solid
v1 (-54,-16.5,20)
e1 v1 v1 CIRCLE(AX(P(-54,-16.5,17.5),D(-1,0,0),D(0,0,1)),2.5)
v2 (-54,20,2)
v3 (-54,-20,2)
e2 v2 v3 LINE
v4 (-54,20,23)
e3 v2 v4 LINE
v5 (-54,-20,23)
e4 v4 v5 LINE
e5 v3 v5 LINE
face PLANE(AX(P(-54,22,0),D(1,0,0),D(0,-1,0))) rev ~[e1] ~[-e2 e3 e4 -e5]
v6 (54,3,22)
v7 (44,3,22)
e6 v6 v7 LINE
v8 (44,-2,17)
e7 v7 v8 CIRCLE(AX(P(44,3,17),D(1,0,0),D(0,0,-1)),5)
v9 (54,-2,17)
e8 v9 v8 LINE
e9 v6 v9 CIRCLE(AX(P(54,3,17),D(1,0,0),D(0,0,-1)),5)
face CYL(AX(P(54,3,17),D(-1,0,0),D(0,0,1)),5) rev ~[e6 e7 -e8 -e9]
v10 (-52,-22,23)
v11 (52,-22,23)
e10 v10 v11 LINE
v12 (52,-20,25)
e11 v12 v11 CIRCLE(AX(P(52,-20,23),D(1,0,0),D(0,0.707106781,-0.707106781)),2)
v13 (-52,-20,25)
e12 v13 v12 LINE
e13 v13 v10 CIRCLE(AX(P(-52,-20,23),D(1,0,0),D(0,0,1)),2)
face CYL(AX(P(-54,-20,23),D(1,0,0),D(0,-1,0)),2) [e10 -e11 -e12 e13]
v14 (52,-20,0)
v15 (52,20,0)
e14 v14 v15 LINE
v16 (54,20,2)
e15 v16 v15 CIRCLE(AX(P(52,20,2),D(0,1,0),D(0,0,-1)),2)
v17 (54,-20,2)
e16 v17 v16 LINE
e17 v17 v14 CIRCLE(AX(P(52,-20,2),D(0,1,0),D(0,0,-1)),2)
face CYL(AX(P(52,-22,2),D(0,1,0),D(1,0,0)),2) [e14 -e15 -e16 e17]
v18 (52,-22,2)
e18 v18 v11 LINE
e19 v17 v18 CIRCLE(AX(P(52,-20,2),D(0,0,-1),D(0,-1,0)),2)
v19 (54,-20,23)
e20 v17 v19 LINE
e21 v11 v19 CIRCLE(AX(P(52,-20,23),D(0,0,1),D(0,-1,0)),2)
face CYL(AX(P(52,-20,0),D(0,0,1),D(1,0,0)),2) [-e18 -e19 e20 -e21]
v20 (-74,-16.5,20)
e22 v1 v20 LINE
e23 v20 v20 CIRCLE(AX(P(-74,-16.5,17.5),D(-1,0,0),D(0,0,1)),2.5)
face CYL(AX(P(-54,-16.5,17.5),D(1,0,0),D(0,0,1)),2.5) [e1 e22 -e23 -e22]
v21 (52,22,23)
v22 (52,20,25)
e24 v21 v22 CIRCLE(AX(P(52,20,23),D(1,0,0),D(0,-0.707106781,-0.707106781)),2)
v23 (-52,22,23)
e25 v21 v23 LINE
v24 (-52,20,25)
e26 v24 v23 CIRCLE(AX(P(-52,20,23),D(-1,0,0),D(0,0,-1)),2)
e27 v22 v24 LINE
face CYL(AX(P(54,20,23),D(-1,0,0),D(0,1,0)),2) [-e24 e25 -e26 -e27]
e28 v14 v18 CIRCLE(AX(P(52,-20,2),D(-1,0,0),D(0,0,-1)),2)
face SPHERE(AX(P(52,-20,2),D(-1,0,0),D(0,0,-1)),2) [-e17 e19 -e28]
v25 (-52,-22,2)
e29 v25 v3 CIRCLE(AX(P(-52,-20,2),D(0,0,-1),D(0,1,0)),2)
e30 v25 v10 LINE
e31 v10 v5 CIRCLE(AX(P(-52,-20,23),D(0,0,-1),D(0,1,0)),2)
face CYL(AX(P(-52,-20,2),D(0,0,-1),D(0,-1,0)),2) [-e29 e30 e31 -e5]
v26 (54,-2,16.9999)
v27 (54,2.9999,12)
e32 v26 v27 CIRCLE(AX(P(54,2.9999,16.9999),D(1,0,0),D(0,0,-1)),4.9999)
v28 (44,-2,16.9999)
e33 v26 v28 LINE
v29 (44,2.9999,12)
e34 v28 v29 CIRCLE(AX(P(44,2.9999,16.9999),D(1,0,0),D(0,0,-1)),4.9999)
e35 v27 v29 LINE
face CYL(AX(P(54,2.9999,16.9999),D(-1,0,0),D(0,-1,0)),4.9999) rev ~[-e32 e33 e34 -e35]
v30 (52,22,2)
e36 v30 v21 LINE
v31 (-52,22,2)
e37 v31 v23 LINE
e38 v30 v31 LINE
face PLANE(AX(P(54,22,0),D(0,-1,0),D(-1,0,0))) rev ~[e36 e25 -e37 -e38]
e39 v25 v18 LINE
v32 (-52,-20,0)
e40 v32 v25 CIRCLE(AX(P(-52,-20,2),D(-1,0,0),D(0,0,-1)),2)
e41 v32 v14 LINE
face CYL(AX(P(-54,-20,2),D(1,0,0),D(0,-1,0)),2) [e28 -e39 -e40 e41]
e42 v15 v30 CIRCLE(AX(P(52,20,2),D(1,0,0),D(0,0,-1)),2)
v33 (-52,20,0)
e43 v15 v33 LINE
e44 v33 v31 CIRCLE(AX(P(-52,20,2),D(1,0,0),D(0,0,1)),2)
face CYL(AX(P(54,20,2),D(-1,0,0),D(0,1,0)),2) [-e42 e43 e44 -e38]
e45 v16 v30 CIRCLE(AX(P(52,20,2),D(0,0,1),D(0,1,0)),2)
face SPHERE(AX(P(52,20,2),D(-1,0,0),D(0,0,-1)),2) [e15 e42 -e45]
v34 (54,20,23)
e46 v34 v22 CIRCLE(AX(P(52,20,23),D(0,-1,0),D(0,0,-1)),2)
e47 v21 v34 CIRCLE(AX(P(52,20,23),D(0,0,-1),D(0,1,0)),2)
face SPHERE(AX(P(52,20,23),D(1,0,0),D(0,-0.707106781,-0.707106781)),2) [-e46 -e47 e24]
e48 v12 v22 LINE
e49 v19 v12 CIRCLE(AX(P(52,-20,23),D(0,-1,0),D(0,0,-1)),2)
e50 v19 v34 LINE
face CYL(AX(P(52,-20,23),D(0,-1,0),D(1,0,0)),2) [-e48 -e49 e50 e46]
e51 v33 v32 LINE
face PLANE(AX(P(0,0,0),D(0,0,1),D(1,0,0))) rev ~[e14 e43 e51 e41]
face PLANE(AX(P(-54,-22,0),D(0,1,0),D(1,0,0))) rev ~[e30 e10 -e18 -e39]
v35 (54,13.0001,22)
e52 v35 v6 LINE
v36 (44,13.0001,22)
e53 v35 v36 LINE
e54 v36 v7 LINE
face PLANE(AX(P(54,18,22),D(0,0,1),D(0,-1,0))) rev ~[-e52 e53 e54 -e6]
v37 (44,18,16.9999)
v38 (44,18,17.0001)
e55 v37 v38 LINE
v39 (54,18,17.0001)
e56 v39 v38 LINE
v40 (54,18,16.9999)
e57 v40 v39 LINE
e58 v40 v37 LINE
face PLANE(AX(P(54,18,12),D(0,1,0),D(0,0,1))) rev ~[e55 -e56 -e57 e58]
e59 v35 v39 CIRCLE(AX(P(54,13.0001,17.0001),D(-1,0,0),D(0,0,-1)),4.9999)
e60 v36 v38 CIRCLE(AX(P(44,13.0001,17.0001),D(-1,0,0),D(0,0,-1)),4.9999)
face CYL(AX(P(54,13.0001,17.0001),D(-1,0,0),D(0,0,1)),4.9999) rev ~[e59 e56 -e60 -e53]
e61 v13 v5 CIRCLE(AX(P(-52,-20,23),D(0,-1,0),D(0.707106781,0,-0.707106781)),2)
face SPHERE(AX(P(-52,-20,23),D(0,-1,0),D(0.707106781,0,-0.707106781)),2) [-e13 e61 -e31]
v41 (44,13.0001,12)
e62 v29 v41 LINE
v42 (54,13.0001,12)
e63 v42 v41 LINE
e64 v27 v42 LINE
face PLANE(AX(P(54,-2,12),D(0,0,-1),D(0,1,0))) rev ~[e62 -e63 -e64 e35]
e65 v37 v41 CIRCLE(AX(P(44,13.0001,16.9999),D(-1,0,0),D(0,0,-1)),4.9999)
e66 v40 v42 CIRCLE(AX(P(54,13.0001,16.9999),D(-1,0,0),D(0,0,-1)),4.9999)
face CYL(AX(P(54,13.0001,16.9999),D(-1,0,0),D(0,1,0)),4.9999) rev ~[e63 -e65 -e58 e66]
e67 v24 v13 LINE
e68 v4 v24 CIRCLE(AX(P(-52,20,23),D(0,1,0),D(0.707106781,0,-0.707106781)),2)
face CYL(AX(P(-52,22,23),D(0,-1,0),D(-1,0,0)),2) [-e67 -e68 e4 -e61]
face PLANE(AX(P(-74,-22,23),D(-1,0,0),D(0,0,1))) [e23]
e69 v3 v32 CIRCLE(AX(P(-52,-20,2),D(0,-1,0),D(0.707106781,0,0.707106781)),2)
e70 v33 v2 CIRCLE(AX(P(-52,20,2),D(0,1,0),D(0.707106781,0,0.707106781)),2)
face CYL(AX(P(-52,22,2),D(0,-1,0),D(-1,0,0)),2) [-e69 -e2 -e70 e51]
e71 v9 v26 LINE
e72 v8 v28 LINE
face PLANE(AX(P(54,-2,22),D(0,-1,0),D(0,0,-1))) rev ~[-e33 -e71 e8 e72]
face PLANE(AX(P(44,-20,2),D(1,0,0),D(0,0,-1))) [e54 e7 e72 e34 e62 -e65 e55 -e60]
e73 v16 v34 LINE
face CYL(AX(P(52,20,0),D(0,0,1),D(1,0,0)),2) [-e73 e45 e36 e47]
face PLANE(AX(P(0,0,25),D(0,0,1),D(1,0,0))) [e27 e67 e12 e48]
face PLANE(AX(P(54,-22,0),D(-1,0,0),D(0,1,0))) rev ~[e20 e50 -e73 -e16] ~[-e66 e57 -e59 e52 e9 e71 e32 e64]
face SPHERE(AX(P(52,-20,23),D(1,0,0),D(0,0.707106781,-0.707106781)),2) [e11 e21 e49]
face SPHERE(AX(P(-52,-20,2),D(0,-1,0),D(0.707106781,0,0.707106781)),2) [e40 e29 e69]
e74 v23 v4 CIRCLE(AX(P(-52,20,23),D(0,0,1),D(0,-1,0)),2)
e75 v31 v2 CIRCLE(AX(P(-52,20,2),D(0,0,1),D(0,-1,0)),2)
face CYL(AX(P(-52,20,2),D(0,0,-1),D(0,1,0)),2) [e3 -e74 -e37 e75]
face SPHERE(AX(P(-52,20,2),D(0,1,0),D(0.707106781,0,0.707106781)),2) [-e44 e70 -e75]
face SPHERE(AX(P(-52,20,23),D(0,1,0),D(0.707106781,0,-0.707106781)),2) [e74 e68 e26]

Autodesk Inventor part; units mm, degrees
ref_plane "YZ Plane" through (0, 0, 0) normal (1, 0, 0) x (0, 1, 0)
ref_plane "XZ Plane" through (0, 0, 0) normal (0, 1, 0) x (-1, 0, 0)
ref_plane "XY Plane" through (0, 0, 0) normal (0, 0, 1) x (1, 0, 0)
sketch "Sketch1" plane through (0, 0, 0) normal (0, 0, 1) x (1, 0, 0)
  line L0 (54, 22) -> (-54, 22)
  line L1 (-54, 22) -> (-54, -22)
  line L2 (-54, -22) -> (54, -22)
  line L3 (54, -22) -> (54, 22)
  line L4 (-54, 0) -> (54, 0) construction
  line L5 (0, 22) -> (0, -22) construction
  point P0 (0, 0)
  point P1 (0, 0)
  dimension "d0" = 108
  dimension "d1" = 44
extrude "Extrusion1" add sketch "Sketch1" along normal blind 25
fillet "Fillet1" radius 2 9 edges at (0, 22, 25) (0, -22, 25) (0, -22, 0) (0, 22, 0) (54, 0, 0) (54, 22, 12.5) (54, -22, 12.5) (-54, 0, 25) (-54, 0, 0)
sketch "Sketch2" plane through (54, -20, 2) normal (1, 0, 0) x (0, 0, -1)
  line L0 (0, 0) -> (-23, 0) construction
  line L1 (0, 40) -> (0, 0) construction
  line L2 (-23, 40) -> (0, 40) construction
  line L3 (-23, 0) -> (-23, 40) construction
  line L4 (-20, 18) -> (-10, 18)
  line L5 (-10, 18) -> (-10, 38)
  line L6 (-10, 38) -> (-20, 38)
  line L7 (-20, 38) -> (-20, 18)
  point P0 (2, 20)
  dimension "d5" = 10
  dimension "d6" = 20
  dimension "d7" = 3
  dimension "d8" = 18
extrude "Extrusion2" cut sketch "Sketch2" against normal blind 10
sketch "Sketch3" plane through (-54, -22, 23) normal (-1, 0, 0) x (0, 0, 1)
  line L0 (0, 44) -> (0, 0) construction
  line L1 (-21, 0) -> (0, 0) construction
  circle A0 centre (-5.5, 5.5) radius 2.5
  point P0 (-23, 22)
  dimension "d11" = 5
  dimension "d13" = 3
  dimension "d14" = 3
extrude "Extrusion3" add sketch "Sketch3" along normal blind 20
fillet "Fillet2" radius 2 3 edges at (53.4142, 21.4142, 24.4142) (53.4142, -21.4142, 24.4142) (54, 0, 25)
fillet "Fillet3" radius 5 1 edges at (49, -2, 22)
fillet "Fillet4" radius 5 3 edges at (49, 18, 22) (49, 18, 12) (49, -2, 12)
fillet "Fillet5" radius 2 6 edges at (-53.4142, 21.4142, 24.4142) (-53.4142, 21.4142, 0.5858) (-54, 22, 12.5) (-53.4142, -21.4142, 24.4142) (-53.4142, -21.4142, 0.5858) (-54, -22, 12.5)
properties part number "Transformer" material "PET Plastic"
